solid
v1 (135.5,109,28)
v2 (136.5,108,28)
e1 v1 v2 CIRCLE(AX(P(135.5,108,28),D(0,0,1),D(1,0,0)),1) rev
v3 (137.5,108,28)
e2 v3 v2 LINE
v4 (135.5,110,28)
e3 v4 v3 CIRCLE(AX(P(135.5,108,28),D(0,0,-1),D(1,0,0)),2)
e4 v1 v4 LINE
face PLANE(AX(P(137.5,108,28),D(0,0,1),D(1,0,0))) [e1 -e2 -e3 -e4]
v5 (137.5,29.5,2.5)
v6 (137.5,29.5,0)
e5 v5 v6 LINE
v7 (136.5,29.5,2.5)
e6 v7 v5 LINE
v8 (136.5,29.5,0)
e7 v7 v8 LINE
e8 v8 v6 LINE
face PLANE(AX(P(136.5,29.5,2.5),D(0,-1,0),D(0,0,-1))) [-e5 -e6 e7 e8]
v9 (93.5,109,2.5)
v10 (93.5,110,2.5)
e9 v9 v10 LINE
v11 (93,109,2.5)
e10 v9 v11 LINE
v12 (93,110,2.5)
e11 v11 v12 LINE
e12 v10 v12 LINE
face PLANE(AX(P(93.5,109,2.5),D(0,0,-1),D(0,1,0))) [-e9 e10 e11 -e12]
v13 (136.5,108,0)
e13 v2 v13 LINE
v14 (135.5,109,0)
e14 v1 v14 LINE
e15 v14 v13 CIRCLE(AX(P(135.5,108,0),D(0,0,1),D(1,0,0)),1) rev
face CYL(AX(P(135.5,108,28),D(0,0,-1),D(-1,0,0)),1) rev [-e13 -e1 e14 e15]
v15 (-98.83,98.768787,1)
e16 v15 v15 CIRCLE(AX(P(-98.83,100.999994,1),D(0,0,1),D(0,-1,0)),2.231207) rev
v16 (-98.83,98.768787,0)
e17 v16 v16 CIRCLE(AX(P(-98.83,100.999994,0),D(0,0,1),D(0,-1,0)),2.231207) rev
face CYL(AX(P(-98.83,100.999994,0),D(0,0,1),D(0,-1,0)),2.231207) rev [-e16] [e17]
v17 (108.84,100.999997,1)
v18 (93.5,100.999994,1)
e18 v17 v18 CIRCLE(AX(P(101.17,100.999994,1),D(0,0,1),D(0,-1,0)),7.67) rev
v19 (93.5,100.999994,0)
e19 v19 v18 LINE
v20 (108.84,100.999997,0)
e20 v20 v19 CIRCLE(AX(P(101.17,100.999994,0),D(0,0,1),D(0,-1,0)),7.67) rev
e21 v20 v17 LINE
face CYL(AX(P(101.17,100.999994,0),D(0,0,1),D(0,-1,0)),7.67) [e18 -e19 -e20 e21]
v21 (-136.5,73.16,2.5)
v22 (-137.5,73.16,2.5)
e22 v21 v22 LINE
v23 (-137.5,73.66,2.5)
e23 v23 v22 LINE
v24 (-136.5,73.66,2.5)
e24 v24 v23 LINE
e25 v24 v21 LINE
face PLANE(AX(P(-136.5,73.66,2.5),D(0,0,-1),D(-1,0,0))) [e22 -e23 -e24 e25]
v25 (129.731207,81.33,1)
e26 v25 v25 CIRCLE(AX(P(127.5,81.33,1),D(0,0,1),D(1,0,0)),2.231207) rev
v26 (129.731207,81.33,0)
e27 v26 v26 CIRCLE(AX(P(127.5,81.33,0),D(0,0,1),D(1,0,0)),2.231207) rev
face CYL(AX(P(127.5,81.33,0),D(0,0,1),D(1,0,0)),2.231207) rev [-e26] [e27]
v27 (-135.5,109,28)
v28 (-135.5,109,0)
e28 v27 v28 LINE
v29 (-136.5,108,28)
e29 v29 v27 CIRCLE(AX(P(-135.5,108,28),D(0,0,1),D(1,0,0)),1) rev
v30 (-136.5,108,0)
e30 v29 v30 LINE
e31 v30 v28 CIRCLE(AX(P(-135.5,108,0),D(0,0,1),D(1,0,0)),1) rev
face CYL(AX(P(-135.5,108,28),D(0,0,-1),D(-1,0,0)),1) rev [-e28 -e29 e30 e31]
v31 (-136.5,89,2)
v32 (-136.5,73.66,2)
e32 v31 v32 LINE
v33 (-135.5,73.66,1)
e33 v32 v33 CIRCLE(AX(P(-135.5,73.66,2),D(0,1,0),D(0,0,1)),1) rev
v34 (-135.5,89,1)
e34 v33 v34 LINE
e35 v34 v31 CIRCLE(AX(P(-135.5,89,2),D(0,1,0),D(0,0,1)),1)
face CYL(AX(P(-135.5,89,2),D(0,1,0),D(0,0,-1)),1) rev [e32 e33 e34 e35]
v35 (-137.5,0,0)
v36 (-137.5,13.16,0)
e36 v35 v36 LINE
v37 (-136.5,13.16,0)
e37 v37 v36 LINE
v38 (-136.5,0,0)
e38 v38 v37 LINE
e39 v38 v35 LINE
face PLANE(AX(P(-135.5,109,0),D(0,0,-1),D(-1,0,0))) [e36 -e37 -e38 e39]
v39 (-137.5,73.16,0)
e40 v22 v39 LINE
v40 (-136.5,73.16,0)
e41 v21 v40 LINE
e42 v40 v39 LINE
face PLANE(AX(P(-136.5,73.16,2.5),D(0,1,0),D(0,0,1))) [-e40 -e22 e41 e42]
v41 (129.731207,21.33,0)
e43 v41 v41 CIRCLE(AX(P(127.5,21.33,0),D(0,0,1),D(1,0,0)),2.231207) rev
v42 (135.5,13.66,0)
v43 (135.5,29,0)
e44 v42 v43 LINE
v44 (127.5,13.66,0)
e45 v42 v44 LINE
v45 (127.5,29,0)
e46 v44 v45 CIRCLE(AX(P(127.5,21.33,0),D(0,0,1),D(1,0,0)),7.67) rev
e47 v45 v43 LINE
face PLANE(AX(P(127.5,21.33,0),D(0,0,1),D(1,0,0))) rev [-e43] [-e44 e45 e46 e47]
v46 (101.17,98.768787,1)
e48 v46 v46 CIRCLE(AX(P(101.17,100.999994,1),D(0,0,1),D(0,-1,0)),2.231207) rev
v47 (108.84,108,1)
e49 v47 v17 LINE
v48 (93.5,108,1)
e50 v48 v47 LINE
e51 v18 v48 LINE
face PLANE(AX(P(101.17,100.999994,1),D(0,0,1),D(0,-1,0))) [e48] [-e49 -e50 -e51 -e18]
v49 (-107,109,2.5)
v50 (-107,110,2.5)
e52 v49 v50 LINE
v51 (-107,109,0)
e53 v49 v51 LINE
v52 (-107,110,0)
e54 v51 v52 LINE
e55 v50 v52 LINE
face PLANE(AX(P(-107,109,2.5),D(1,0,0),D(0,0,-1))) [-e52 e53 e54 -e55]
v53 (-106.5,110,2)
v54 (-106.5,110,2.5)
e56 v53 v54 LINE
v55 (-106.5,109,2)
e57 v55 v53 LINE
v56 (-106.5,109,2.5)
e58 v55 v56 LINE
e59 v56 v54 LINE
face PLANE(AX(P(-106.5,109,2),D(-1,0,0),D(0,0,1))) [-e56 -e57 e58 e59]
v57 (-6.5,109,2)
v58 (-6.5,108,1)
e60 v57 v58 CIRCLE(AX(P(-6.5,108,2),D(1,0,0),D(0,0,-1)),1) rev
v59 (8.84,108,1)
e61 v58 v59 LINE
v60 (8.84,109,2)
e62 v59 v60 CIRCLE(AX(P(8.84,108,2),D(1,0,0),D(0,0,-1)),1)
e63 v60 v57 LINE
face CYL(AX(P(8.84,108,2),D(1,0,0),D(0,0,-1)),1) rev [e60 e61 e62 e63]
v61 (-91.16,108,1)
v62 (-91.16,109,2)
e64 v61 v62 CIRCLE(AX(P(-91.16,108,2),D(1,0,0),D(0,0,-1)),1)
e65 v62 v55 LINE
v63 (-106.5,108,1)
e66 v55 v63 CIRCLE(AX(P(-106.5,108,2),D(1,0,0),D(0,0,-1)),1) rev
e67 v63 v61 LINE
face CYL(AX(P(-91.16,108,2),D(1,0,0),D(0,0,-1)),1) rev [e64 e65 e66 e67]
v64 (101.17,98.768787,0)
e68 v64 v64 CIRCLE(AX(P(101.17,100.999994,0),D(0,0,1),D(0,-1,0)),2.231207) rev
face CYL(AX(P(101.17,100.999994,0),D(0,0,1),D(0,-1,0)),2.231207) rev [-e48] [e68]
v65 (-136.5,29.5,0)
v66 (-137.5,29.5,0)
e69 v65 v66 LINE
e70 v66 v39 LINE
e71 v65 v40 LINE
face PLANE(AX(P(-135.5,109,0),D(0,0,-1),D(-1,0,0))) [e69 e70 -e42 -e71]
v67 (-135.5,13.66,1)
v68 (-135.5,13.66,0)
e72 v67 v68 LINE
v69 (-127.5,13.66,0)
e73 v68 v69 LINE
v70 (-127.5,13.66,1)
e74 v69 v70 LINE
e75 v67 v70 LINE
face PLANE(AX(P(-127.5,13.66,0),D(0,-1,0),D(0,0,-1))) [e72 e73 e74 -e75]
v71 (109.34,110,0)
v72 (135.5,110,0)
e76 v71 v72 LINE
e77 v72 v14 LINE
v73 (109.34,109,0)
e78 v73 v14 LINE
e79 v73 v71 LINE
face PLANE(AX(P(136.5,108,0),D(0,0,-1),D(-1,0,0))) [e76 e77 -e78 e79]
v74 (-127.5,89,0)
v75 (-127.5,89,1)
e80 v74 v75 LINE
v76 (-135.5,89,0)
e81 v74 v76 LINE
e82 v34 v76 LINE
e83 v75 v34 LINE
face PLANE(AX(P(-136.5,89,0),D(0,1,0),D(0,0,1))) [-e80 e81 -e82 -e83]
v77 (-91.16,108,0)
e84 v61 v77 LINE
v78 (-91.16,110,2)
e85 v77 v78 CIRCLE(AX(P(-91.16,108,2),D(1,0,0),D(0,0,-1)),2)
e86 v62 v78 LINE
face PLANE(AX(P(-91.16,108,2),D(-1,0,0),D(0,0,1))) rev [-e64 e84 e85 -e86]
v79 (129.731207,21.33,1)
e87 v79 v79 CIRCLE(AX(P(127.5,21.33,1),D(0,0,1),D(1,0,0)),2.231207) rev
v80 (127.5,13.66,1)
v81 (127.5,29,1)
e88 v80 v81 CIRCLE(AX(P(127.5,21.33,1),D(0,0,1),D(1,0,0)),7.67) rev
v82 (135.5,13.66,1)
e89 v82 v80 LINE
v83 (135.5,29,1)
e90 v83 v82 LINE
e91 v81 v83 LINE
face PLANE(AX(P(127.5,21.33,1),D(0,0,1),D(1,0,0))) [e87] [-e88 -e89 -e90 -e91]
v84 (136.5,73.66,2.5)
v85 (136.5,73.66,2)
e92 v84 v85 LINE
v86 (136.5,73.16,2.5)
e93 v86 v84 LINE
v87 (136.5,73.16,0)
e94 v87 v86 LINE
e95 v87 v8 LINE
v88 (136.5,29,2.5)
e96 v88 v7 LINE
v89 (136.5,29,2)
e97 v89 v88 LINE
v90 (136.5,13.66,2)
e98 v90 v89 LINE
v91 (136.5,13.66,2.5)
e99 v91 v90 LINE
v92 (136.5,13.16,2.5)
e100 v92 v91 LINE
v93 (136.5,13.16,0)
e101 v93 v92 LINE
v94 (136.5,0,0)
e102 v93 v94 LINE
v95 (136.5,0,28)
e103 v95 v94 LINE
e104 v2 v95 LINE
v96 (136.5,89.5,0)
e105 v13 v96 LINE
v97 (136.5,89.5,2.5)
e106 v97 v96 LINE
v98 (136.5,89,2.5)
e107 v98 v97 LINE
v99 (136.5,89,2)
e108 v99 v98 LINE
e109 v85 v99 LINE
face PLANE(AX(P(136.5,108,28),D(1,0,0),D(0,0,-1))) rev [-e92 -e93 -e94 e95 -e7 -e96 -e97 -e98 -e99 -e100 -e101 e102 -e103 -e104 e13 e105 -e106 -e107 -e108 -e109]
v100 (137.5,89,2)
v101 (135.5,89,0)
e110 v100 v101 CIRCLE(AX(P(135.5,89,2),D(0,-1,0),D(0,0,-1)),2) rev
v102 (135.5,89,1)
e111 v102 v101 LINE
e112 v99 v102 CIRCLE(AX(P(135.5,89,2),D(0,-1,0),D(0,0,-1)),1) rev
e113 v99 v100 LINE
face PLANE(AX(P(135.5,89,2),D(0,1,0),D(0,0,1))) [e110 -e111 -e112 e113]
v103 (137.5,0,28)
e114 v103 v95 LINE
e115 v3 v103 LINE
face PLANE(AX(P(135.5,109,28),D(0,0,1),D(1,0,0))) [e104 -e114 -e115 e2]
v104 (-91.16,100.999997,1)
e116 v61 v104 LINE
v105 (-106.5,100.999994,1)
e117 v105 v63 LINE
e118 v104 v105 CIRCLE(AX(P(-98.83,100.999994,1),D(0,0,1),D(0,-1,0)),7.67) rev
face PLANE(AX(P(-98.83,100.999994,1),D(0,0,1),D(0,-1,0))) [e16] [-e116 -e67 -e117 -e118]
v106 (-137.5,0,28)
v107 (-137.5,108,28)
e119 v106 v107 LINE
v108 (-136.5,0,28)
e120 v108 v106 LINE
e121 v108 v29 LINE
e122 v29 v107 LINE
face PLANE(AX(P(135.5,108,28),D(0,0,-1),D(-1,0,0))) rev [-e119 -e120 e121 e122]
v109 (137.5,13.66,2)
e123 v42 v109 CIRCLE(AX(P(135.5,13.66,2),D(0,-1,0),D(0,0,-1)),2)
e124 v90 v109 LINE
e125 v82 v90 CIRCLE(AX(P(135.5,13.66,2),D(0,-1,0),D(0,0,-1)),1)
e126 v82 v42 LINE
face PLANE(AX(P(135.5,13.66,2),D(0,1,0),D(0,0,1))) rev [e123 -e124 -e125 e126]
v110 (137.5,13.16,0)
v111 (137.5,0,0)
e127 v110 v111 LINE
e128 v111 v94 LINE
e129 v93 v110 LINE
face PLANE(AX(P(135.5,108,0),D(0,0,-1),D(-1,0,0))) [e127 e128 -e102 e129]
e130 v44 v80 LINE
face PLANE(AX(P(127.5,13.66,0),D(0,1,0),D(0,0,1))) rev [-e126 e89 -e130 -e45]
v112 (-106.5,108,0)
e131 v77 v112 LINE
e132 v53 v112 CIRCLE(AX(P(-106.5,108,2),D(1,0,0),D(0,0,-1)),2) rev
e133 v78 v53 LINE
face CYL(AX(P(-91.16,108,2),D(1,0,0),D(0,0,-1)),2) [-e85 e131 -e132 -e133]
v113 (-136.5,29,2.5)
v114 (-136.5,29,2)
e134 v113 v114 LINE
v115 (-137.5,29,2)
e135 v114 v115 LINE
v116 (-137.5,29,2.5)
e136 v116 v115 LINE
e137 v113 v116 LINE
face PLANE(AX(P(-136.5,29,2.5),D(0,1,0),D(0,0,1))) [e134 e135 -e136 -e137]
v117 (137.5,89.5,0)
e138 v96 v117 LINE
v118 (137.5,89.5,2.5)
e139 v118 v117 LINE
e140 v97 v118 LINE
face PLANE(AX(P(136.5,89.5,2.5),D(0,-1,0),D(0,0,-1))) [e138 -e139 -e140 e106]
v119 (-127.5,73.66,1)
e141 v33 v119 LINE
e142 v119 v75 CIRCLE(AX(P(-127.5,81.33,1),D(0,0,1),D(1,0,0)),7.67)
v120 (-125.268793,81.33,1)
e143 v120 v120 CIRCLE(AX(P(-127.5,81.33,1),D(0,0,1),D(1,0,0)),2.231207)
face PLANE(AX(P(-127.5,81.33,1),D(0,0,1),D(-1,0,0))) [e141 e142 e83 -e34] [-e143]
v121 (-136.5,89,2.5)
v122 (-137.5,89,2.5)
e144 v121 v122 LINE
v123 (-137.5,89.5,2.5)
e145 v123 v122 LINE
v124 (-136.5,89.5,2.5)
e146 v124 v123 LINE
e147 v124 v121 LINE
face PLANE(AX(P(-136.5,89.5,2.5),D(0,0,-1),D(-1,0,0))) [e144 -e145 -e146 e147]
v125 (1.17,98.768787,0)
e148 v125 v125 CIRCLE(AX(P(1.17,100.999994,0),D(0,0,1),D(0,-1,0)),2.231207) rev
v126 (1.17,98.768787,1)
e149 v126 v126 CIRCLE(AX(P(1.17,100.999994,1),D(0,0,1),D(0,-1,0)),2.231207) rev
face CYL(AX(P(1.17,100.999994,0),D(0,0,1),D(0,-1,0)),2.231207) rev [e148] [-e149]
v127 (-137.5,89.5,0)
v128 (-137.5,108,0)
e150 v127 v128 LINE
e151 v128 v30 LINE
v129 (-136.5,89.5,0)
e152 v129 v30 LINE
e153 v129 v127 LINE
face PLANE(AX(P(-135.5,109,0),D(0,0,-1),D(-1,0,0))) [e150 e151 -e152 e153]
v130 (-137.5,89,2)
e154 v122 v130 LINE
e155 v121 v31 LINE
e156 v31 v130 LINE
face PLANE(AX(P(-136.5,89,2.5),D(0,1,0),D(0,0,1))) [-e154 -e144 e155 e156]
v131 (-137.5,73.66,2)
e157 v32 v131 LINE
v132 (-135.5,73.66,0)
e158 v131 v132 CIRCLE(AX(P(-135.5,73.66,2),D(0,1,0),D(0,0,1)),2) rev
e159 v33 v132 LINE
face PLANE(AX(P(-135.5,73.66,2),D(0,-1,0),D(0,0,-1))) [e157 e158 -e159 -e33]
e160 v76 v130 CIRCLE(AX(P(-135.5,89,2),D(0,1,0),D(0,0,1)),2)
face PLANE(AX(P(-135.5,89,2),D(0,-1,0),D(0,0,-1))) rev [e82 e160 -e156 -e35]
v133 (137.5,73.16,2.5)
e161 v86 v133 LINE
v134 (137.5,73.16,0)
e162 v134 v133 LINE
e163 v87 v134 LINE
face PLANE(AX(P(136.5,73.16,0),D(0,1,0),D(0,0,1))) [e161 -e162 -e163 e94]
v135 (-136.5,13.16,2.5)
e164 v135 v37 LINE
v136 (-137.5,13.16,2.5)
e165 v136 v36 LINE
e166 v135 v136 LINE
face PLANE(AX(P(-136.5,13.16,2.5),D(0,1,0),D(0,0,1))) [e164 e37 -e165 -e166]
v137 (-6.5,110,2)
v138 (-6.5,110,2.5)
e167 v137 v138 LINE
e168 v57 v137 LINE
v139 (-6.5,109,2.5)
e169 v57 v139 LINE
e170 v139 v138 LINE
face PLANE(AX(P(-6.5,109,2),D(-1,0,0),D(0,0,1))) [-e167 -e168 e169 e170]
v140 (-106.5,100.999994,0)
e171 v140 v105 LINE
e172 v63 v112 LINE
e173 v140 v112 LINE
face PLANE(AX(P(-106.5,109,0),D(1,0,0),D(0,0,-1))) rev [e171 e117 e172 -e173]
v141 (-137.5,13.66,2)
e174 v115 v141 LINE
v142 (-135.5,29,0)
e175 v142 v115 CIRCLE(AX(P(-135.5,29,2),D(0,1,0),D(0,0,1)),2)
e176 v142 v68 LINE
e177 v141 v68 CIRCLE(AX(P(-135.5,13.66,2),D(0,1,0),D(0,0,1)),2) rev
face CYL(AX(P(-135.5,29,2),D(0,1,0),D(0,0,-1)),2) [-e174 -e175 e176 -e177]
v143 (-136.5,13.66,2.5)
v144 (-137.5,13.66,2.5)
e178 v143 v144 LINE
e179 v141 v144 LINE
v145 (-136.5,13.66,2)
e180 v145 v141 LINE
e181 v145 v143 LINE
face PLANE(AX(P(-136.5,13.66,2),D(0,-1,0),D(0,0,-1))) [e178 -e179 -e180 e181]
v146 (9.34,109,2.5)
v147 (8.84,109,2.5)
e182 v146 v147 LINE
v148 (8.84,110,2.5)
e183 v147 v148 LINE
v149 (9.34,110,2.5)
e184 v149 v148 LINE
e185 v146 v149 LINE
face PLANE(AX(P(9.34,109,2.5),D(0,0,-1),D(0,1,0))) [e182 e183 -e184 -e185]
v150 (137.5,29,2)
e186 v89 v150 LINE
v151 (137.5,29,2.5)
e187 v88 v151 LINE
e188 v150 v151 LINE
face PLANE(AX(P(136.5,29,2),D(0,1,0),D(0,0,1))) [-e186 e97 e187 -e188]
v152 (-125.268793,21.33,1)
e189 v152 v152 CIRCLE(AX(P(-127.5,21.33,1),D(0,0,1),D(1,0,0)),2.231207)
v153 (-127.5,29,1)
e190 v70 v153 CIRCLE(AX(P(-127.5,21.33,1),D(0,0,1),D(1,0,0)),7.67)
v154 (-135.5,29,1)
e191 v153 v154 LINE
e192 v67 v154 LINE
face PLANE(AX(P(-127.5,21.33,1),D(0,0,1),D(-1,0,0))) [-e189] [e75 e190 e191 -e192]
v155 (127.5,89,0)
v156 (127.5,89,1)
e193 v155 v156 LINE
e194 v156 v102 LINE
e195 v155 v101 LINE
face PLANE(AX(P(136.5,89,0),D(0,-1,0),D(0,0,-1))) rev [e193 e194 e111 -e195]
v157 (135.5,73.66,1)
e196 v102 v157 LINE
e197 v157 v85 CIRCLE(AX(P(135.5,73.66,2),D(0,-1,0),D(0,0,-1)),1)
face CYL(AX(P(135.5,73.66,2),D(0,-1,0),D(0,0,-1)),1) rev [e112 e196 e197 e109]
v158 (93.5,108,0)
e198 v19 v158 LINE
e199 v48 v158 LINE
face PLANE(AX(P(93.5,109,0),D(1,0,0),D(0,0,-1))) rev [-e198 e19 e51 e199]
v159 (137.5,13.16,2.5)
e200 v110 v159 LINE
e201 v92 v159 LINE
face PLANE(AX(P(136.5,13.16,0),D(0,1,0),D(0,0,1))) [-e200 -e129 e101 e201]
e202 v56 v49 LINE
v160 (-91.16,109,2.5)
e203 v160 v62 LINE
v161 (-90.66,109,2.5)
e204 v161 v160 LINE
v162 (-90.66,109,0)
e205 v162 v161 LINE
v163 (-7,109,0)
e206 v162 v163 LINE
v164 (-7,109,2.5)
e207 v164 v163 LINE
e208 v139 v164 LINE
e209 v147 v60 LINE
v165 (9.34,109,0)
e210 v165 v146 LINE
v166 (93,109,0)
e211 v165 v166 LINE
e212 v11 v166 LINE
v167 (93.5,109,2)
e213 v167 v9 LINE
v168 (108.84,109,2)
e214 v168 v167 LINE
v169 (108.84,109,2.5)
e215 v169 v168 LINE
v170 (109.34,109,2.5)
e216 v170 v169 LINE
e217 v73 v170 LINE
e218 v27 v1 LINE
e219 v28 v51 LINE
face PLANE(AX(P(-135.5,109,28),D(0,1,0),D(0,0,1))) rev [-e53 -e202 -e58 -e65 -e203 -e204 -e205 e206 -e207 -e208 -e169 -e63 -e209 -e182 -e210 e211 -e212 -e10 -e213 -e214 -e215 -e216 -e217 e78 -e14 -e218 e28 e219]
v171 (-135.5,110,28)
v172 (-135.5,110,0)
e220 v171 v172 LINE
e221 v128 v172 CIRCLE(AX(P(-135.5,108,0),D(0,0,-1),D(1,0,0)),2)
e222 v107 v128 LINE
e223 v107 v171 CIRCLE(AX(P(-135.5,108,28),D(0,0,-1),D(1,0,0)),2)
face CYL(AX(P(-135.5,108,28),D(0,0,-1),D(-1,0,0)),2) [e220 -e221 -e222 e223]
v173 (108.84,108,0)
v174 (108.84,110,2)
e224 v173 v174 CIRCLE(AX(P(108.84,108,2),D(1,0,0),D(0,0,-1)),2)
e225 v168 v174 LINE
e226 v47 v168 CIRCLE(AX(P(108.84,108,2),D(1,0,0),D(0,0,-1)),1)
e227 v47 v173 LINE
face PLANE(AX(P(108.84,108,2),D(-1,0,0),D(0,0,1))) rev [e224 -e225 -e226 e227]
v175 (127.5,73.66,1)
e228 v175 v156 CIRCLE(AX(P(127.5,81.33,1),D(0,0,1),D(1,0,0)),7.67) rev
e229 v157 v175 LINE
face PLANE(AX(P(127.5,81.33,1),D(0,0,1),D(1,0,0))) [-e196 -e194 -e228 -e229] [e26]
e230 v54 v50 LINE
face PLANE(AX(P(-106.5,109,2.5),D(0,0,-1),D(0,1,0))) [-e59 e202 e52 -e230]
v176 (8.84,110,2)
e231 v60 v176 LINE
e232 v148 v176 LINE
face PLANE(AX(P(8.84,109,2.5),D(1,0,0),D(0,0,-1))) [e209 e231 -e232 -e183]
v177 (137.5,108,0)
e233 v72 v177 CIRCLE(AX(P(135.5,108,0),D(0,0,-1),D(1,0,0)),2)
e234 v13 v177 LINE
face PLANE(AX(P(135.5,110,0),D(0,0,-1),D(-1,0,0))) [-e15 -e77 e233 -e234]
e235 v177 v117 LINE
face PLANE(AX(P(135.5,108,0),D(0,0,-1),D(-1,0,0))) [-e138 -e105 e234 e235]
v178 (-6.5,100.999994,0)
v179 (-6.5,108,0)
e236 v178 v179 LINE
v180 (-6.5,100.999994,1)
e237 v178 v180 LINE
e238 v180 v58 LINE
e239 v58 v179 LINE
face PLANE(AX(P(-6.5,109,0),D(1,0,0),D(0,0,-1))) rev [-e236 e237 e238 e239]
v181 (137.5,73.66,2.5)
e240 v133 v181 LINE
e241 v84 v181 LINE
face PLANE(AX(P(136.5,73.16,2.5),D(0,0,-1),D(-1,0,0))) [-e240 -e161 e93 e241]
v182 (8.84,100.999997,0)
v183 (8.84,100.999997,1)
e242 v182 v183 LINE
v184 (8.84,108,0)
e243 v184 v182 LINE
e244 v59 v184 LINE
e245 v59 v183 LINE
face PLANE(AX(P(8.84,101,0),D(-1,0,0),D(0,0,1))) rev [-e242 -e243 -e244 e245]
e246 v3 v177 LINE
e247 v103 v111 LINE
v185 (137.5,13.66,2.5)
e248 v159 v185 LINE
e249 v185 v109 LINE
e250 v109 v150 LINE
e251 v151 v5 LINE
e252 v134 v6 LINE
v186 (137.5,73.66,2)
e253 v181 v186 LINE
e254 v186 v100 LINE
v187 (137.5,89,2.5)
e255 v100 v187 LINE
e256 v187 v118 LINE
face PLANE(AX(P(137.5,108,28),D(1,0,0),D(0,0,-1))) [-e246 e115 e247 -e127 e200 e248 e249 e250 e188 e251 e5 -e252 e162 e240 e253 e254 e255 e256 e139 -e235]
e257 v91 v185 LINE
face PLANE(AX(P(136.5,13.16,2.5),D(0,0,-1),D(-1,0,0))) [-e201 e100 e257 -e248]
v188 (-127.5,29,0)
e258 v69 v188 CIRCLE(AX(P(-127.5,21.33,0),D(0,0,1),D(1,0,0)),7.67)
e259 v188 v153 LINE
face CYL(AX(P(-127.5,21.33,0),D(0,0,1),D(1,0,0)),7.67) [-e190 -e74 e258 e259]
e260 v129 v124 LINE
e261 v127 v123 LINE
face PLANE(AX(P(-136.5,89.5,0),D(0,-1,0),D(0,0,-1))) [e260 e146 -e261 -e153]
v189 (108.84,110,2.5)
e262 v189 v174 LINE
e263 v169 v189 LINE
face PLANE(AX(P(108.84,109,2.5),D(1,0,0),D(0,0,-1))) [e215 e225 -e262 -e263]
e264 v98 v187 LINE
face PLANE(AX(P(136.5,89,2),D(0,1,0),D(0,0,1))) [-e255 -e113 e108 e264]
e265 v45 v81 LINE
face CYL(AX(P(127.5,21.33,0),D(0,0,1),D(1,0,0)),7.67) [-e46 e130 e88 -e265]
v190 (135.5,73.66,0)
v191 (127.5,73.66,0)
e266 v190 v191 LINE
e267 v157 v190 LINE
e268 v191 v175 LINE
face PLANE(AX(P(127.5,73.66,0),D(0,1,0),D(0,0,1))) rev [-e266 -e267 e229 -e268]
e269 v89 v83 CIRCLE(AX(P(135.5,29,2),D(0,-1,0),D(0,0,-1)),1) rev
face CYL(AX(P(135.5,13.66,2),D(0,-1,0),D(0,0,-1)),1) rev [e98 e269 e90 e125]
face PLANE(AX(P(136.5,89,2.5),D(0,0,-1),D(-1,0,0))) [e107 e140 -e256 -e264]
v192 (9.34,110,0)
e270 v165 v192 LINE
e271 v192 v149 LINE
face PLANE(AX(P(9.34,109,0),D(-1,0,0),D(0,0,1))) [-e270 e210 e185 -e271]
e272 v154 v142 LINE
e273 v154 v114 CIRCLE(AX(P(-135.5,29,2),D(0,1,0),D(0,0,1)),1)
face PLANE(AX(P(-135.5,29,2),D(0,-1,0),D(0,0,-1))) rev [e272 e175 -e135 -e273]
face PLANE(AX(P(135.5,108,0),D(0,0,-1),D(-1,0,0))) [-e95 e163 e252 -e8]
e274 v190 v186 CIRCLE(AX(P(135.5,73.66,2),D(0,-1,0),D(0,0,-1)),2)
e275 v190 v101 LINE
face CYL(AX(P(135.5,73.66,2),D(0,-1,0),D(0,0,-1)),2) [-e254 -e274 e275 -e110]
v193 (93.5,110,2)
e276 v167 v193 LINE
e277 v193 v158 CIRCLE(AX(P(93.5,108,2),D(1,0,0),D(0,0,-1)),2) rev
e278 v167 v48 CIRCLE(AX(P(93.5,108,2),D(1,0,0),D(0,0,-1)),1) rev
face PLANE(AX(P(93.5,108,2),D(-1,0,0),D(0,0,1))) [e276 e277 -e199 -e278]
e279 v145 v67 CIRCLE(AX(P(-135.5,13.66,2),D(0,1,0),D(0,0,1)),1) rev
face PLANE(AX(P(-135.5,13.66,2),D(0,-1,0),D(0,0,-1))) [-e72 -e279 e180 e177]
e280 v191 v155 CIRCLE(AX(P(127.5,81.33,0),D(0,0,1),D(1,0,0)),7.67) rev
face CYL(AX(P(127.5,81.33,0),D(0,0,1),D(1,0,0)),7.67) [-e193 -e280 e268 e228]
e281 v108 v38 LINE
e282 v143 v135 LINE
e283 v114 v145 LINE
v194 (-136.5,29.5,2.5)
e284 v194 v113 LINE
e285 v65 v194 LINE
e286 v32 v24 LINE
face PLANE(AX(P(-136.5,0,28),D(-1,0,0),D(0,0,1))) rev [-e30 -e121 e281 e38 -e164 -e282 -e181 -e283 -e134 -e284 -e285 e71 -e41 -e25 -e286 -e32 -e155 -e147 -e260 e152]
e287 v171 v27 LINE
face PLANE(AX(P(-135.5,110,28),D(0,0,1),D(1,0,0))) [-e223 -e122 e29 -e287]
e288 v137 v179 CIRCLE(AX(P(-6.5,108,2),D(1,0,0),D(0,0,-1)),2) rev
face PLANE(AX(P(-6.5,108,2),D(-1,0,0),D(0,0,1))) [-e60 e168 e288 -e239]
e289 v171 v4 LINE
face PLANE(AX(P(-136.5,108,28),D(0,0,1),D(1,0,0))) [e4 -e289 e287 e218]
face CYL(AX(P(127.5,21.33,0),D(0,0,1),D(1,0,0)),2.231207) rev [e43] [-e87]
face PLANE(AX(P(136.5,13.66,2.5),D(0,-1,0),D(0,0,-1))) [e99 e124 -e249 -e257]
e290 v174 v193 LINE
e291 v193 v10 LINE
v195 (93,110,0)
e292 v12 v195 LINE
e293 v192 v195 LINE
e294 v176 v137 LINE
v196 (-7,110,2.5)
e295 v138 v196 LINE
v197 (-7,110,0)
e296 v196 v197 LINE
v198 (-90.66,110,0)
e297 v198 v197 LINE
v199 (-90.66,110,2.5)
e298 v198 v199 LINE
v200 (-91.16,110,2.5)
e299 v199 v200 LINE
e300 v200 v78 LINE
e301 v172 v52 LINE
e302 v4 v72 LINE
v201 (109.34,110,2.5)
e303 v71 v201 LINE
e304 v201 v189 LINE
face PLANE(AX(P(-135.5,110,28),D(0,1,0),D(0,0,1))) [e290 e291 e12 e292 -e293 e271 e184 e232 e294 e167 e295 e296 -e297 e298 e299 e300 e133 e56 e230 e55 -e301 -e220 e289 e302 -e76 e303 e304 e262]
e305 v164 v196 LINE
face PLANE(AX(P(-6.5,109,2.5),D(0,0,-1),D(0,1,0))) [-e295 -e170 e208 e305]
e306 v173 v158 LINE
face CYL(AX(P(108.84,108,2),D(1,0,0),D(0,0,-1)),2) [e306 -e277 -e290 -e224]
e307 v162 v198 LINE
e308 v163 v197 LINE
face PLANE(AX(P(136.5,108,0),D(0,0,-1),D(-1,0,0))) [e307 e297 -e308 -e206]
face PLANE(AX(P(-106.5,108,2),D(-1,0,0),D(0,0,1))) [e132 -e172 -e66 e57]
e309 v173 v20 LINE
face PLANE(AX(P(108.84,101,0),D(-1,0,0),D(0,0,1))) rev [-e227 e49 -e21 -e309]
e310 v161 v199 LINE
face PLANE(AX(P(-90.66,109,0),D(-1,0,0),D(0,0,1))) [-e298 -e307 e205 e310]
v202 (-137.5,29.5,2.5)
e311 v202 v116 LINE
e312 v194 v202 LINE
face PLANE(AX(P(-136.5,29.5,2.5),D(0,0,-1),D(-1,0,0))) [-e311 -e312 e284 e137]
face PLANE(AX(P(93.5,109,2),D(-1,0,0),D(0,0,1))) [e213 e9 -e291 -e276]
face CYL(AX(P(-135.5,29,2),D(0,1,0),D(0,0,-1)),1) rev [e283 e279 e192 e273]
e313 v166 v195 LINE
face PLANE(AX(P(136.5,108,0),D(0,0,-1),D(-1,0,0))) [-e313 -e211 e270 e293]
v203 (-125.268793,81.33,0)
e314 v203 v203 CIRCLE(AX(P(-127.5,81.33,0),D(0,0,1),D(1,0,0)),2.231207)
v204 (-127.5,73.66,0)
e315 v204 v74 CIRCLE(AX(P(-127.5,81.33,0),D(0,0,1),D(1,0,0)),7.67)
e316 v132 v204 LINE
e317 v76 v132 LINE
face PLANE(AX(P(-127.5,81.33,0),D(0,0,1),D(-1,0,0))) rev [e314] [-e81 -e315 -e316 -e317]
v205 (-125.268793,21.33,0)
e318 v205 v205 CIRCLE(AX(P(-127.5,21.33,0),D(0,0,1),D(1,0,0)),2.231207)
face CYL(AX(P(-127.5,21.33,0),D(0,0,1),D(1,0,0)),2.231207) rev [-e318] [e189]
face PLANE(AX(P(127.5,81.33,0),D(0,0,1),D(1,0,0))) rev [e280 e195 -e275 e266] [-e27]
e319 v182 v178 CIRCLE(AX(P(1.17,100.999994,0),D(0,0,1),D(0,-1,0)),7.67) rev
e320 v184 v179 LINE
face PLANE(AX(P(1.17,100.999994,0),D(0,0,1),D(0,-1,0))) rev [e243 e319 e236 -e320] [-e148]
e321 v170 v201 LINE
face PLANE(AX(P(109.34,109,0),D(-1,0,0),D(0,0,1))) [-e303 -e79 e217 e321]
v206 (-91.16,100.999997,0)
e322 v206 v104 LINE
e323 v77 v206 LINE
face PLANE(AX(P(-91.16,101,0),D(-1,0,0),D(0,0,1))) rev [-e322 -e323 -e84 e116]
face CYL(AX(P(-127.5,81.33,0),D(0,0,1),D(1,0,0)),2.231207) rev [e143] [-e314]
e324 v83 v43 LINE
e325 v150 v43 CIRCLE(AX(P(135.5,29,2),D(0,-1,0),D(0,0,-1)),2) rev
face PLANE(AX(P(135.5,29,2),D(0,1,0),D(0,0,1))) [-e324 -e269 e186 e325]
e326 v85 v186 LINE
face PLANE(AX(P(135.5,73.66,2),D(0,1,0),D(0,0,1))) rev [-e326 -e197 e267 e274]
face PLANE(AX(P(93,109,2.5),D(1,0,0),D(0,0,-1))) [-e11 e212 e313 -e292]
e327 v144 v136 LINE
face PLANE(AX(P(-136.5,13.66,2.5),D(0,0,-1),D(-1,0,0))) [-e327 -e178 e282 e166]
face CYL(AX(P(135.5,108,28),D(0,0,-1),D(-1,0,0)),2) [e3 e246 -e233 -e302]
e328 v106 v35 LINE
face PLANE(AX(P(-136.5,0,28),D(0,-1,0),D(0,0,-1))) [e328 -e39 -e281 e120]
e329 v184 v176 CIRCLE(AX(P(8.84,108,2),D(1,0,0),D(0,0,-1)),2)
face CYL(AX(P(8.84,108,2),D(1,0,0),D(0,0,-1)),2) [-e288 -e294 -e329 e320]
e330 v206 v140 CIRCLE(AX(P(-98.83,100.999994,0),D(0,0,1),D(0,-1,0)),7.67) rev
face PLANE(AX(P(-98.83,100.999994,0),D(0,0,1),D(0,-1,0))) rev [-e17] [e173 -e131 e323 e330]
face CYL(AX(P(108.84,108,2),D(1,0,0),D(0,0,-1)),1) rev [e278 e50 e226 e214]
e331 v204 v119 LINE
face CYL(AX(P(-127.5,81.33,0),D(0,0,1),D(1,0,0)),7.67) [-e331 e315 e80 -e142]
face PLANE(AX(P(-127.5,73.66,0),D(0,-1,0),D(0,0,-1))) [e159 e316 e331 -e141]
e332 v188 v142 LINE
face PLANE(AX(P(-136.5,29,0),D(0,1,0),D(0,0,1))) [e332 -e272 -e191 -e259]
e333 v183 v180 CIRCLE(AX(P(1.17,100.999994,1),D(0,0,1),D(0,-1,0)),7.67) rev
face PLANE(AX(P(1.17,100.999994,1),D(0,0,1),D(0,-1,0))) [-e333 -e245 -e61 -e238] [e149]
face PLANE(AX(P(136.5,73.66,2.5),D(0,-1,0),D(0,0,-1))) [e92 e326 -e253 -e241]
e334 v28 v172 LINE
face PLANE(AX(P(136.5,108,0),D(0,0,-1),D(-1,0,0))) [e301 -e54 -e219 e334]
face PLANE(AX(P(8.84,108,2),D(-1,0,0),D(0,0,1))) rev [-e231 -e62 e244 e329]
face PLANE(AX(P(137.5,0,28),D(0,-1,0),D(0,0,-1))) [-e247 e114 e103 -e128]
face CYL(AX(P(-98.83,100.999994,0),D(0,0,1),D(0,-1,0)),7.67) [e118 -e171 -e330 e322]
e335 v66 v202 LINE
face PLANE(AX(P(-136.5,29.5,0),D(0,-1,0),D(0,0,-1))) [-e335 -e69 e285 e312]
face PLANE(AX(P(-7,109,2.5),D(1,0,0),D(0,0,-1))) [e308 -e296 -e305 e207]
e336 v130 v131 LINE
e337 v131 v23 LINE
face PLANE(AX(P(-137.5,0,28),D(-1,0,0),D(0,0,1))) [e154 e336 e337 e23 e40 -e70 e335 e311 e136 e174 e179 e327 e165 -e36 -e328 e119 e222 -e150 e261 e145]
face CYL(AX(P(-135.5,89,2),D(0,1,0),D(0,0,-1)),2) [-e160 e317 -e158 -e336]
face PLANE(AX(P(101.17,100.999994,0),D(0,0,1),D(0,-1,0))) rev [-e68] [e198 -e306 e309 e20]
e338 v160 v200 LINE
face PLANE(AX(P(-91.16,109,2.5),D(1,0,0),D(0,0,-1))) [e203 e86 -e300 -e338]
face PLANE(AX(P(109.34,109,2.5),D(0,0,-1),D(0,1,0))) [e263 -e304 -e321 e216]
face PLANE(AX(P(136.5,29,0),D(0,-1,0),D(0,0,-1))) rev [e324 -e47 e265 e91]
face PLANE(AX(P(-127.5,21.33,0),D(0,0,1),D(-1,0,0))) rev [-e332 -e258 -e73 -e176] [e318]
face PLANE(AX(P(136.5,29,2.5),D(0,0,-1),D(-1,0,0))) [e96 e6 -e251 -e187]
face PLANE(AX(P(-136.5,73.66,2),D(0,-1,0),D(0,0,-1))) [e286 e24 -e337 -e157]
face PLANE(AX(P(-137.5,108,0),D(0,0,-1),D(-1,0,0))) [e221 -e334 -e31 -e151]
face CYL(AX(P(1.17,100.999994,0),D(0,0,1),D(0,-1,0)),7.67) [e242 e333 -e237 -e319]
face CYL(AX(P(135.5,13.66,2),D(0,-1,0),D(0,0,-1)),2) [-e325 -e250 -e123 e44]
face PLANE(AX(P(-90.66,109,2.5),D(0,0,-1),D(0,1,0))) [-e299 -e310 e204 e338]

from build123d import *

# Parameters (mm, degrees)
SM_BASE_FLANGE_1_DEPTH            = 28
SM_EDGE_FLANGE_1_STRIP_W          = 6
SM_EDGE_FLANGE_1_STRIP_H          = 1
SM_EDGE_FLANGE_1_STRIP_CUT_DEPTH  = 15.34
SM_EDGE_FLANGE_1_RELIEF_W         = 6.5
SM_EDGE_FLANGE_1_RELIEF_H         = 0.5
SM_EDGE_FLANGE_1_RELIEF_CUT_DEPTH = 1
SM_EDGE_FLANGE_1_DEPTH            = 15.34
SM_EDGE_FLANGE_1_PROFILE_R        = 2.231207153
SM_EDGE_FLANGE_1_FLAT_DEPTH       = 1
PATTERN_LINEAR_1_COUNT            = 2
PATTERN_LINEAR_1_PITCH            = 60
MIRROR_1_COPY_1_SKETCH_W          = 6
MIRROR_1_COPY_1_SKETCH_H          = 1
MIRROR_1_COPY_1_DEPTH             = 15.34
MIRROR_1_COPY_2_SKETCH_W          = 6.5
MIRROR_1_COPY_2_SKETCH_H          = 0.5
MIRROR_1_COPY_2_DEPTH             = 1
MIRROR_1_COPY_3_DEPTH             = 15.34
MIRROR_1_COPY_4_SKETCH_R          = 2.231207153
MIRROR_1_COPY_4_DEPTH             = 1
SM_EDGE_FLANGE_2_STRIP_W          = 6
SM_EDGE_FLANGE_2_STRIP_H          = 1
SM_EDGE_FLANGE_2_STRIP_CUT_DEPTH  = 15.34
SM_EDGE_FLANGE_2_RELIEF_W         = 6.5
SM_EDGE_FLANGE_2_RELIEF_H         = 0.5
SM_EDGE_FLANGE_2_RELIEF_CUT_DEPTH = 1
SM_EDGE_FLANGE_2_DEPTH            = 15.34
SM_EDGE_FLANGE_2_PROFILE_R        = 2.231207153
SM_EDGE_FLANGE_2_FLAT_DEPTH       = 1
PATTERN_LINEAR_2_COUNT            = 3
PATTERN_LINEAR_2_PITCH            = 100


# Sheet-metal steps are written as plain solids
with BuildPart() as part:
    # Sketch 2 → Базовая кромка1 (new body)
    with BuildSketch(Plane.XY):
        with BuildLine():
            Line((-137.5, 0), (-137.5, 108))
            ThreePointArc((-137.5, 108), (-136.914213562, 109.414213562), (-135.5, 110))
            Line((-135.5, 110), (135.5, 110))
            ThreePointArc((135.5, 110), (136.914213562, 109.414213562), (137.5, 108))
            Line((137.5, 108), (137.5, 0))
            Line((137.5, 0), (136.5, 0))
            Line((136.5, 0), (136.5, 108))
            ThreePointArc((136.5, 108), (136.207106781, 108.707106781), (135.5, 109))
            Line((135.5, 109), (-135.5, 109))
            ThreePointArc((-135.5, 109), (-136.207106781, 108.707106781), (-136.5, 108))
            Line((-136.5, 108), (-136.5, 0))
            Line((-136.5, 0), (-137.5, 0))
        make_face()
    extrude(amount=SM_BASE_FLANGE_1_DEPTH)

    # Ребро-кромка1 strip (across the edge) → Ребро-кромка1 strip cut (cut)
    with BuildSketch(Plane(origin=(136.5, 89, 0), x_dir=(0, 0, 1), z_dir=(0, -1, 0))):
        with Locations((-1, -0.5)):
            Rectangle(SM_EDGE_FLANGE_1_STRIP_W, SM_EDGE_FLANGE_1_STRIP_H)
    sm_edge_flange_1_strip_cut = extrude(amount=SM_EDGE_FLANGE_1_STRIP_CUT_DEPTH, mode=Mode.SUBTRACT)

    # Ребро-кромка1 relief (on the sheet) → Ребро-кромка1 relief cut (cut)
    with BuildSketch(Plane(origin=(136.5, 89, 2), x_dir=(0, 0, 1), z_dir=(-1, 0, 0))):
        with Locations((-2.75, 0.25)):
            Rectangle(SM_EDGE_FLANGE_1_RELIEF_W, SM_EDGE_FLANGE_1_RELIEF_H)
        with Locations((-2.75, -15.59)):
            Rectangle(SM_EDGE_FLANGE_1_RELIEF_W, SM_EDGE_FLANGE_1_RELIEF_H)
    sm_edge_flange_1_relief_cut = extrude(amount=-SM_EDGE_FLANGE_1_RELIEF_CUT_DEPTH, mode=Mode.SUBTRACT)

    # Ребро-кромка1 bend section (across the edge) → Ребро-кромка1 (add)
    with BuildSketch(Plane(origin=(136.5, 89, 0), x_dir=(0, 0, 1), z_dir=(0, -1, 0))):
        with BuildLine():
            Line((0, 1), (1, 1))
            ThreePointArc((1, 1), (1.292893219, 0.292893219), (2, 0))
            Line((2, 0), (2, -1))
            ThreePointArc((2, -1), (0.585786438, -0.414213562), (0, 1))
        make_face()
    sm_edge_flange_1 = extrude(amount=SM_EDGE_FLANGE_1_DEPTH)

    # Ребро-кромка1 profile (on flange) → Ребро-кромка1 flat (add)
    with BuildSketch(Plane(origin=(136.5, 0, 0), x_dir=(0, -1, 0), z_dir=(0, 0, -1))):
        with BuildLine():
            ThreePointArc((-73.66, 9), (-81.33, 16.67), (-89, 9))
            Line((-89, 9), (-89, 1))
            Line((-89, 1), (-73.66, 1))
            Line((-73.66, 1), (-73.66, 9))
        make_face()
        with Locations((-81.33, 9)):
            Circle(SM_EDGE_FLANGE_1_PROFILE_R, mode=Mode.SUBTRACT)
    sm_edge_flange_1_flat = extrude(amount=-SM_EDGE_FLANGE_1_FLAT_DEPTH)

    # Линейный массив1: Ребро-кромка1 strip cut, Ребро-кромка1 relief cut, Ребро-кромка1, Ребро-кромка1 flat ×2
    with Locations(*[(0, -i * PATTERN_LINEAR_1_PITCH, 0) for i in range(1, PATTERN_LINEAR_1_COUNT)]):
        add(sm_edge_flange_1_strip_cut, mode=Mode.SUBTRACT)
        add(sm_edge_flange_1_relief_cut, mode=Mode.SUBTRACT)
        add(sm_edge_flange_1)
        add(sm_edge_flange_1_flat)

    # Зеркальное отражение1: Ребро-кромка1 strip cut, Ребро-кромка1 relief cut, Ребро-кромка1, Ребро-кромка1 flat across plane
    add(sm_edge_flange_1_strip_cut.mirror(Plane(origin=(0, 0, 0), x_dir=(0, 0, 1), z_dir=(1, 0, 0))), mode=Mode.SUBTRACT)
    add(sm_edge_flange_1_relief_cut.mirror(Plane(origin=(0, 0, 0), x_dir=(0, 0, 1), z_dir=(1, 0, 0))), mode=Mode.SUBTRACT)
    add(sm_edge_flange_1.mirror(Plane(origin=(0, 0, 0), x_dir=(0, 0, 1), z_dir=(1, 0, 0))))
    add(sm_edge_flange_1_flat.mirror(Plane(origin=(0, 0, 0), x_dir=(0, 0, 1), z_dir=(1, 0, 0))))

    # Зеркальное отражение1 copy 1 sketch → Зеркальное отражение1 copy 1 (cut)
    with BuildSketch(Plane(origin=(-136.5, 29, 0), x_dir=(0, 0, 1), z_dir=(0, -1, 0))):
        with Locations((-1, 0.5)):
            Rectangle(MIRROR_1_COPY_1_SKETCH_W, MIRROR_1_COPY_1_SKETCH_H)
    extrude(amount=MIRROR_1_COPY_1_DEPTH, mode=Mode.SUBTRACT)

    # Зеркальное отражение1 copy 2 sketch → Зеркальное отражение1 copy 2 (cut)
    with BuildSketch(Plane(origin=(-136.5, 29, 2), x_dir=(0, 0, 1), z_dir=(1, 0, 0))):
        with Locations((-2.75, -0.25)):
            Rectangle(MIRROR_1_COPY_2_SKETCH_W, MIRROR_1_COPY_2_SKETCH_H)
        with Locations((-2.75, 15.59)):
            Rectangle(MIRROR_1_COPY_2_SKETCH_W, MIRROR_1_COPY_2_SKETCH_H)
    extrude(amount=-MIRROR_1_COPY_2_DEPTH, mode=Mode.SUBTRACT)

    # Зеркальное отражение1 copy 3 sketch → Зеркальное отражение1 copy 3 (add)
    with BuildSketch(Plane(origin=(-136.5, 29, 0), x_dir=(0, 0, 1), z_dir=(0, -1, 0))):
        with BuildLine():
            Line((0, -1), (1, -1))
            ThreePointArc((1, -1), (1.292893219, -0.292893219), (2, 0))
            Line((2, 0), (2, 1))
            ThreePointArc((2, 1), (0.585786438, 0.414213562), (0, -1))
        make_face()
    extrude(amount=MIRROR_1_COPY_3_DEPTH)

    # Зеркальное отражение1 copy 4 sketch → Зеркальное отражение1 copy 4 (add)
    with BuildSketch(Plane(origin=(-136.5, -60, 0), x_dir=(0, -1, 0), z_dir=(0, 0, -1))):
        with BuildLine():
            ThreePointArc((-73.66, -9), (-81.33, -16.67), (-89, -9))
            Line((-89, -9), (-89, -1))
            Line((-89, -1), (-73.66, -1))
            Line((-73.66, -1), (-73.66, -9))
        make_face()
        with Locations((-81.33, -9)):
            Circle(MIRROR_1_COPY_4_SKETCH_R, mode=Mode.SUBTRACT)
    extrude(amount=-MIRROR_1_COPY_4_DEPTH)

    # Ребро-кромка2 strip (across the edge) → Ребро-кромка2 strip cut (cut)
    with BuildSketch(Plane(origin=(-106.5, 109, 0), x_dir=(0, 0, 1), z_dir=(1, 0, 0))):
        with Locations((-1, -0.5)):
            Rectangle(SM_EDGE_FLANGE_2_STRIP_W, SM_EDGE_FLANGE_2_STRIP_H)
    sm_edge_flange_2_strip_cut = extrude(amount=SM_EDGE_FLANGE_2_STRIP_CUT_DEPTH, mode=Mode.SUBTRACT)

    # Ребро-кромка2 relief (on the sheet) → Ребро-кромка2 relief cut (cut)
    with BuildSketch(Plane(origin=(-106.5, 109, 2), x_dir=(0, 0, 1), z_dir=(0, -1, 0))):
        with Locations((-2.75, 0.25)):
            Rectangle(SM_EDGE_FLANGE_2_RELIEF_W, SM_EDGE_FLANGE_2_RELIEF_H)
        with Locations((-2.75, -15.59)):
            Rectangle(SM_EDGE_FLANGE_2_RELIEF_W, SM_EDGE_FLANGE_2_RELIEF_H)
    sm_edge_flange_2_relief_cut = extrude(amount=-SM_EDGE_FLANGE_2_RELIEF_CUT_DEPTH, mode=Mode.SUBTRACT)

    # Ребро-кромка2 bend section (across the edge) → Ребро-кромка2 (add)
    with BuildSketch(Plane(origin=(-106.5, 109, 0), x_dir=(0, 0, 1), z_dir=(1, 0, 0))):
        with BuildLine():
            Line((0, 1), (1, 1))
            ThreePointArc((1, 1), (1.292893219, 0.292893219), (2, 0))
            Line((2, 0), (2, -1))
            ThreePointArc((2, -1), (0.585786438, -0.414213562), (0, 1))
        make_face()
    sm_edge_flange_2 = extrude(amount=SM_EDGE_FLANGE_2_DEPTH)

    # Ребро-кромка2 profile (on flange) → Ребро-кромка2 flat (add)
    with BuildSketch(Plane(origin=(0, 109, 0), x_dir=(1, 0, 0), z_dir=(0, 0, -1))):
        with BuildLine():
            ThreePointArc((-91.16, 8), (-98.829997184, 15.670005632), (-106.5, 8.000005632))
            Line((-106.5, 8.000005632), (-106.5, 1))
            Line((-106.5, 1), (-91.16, 1))
            Line((-91.16, 1), (-91.16, 8))
        make_face()
        with Locations((-98.83, 8.000005632)):
            Circle(SM_EDGE_FLANGE_2_PROFILE_R, mode=Mode.SUBTRACT)
    sm_edge_flange_2_flat = extrude(amount=-SM_EDGE_FLANGE_2_FLAT_DEPTH)

    # Линейный массив2: Ребро-кромка2 strip cut, Ребро-кромка2 relief cut, Ребро-кромка2, Ребро-кромка2 flat ×3
    with Locations(*[(i * PATTERN_LINEAR_2_PITCH, 0, 0) for i in range(1, PATTERN_LINEAR_2_COUNT)]):
        add(sm_edge_flange_2_strip_cut, mode=Mode.SUBTRACT)
        add(sm_edge_flange_2_relief_cut, mode=Mode.SUBTRACT)
        add(sm_edge_flange_2)
        add(sm_edge_flange_2_flat)


solid = part.part
